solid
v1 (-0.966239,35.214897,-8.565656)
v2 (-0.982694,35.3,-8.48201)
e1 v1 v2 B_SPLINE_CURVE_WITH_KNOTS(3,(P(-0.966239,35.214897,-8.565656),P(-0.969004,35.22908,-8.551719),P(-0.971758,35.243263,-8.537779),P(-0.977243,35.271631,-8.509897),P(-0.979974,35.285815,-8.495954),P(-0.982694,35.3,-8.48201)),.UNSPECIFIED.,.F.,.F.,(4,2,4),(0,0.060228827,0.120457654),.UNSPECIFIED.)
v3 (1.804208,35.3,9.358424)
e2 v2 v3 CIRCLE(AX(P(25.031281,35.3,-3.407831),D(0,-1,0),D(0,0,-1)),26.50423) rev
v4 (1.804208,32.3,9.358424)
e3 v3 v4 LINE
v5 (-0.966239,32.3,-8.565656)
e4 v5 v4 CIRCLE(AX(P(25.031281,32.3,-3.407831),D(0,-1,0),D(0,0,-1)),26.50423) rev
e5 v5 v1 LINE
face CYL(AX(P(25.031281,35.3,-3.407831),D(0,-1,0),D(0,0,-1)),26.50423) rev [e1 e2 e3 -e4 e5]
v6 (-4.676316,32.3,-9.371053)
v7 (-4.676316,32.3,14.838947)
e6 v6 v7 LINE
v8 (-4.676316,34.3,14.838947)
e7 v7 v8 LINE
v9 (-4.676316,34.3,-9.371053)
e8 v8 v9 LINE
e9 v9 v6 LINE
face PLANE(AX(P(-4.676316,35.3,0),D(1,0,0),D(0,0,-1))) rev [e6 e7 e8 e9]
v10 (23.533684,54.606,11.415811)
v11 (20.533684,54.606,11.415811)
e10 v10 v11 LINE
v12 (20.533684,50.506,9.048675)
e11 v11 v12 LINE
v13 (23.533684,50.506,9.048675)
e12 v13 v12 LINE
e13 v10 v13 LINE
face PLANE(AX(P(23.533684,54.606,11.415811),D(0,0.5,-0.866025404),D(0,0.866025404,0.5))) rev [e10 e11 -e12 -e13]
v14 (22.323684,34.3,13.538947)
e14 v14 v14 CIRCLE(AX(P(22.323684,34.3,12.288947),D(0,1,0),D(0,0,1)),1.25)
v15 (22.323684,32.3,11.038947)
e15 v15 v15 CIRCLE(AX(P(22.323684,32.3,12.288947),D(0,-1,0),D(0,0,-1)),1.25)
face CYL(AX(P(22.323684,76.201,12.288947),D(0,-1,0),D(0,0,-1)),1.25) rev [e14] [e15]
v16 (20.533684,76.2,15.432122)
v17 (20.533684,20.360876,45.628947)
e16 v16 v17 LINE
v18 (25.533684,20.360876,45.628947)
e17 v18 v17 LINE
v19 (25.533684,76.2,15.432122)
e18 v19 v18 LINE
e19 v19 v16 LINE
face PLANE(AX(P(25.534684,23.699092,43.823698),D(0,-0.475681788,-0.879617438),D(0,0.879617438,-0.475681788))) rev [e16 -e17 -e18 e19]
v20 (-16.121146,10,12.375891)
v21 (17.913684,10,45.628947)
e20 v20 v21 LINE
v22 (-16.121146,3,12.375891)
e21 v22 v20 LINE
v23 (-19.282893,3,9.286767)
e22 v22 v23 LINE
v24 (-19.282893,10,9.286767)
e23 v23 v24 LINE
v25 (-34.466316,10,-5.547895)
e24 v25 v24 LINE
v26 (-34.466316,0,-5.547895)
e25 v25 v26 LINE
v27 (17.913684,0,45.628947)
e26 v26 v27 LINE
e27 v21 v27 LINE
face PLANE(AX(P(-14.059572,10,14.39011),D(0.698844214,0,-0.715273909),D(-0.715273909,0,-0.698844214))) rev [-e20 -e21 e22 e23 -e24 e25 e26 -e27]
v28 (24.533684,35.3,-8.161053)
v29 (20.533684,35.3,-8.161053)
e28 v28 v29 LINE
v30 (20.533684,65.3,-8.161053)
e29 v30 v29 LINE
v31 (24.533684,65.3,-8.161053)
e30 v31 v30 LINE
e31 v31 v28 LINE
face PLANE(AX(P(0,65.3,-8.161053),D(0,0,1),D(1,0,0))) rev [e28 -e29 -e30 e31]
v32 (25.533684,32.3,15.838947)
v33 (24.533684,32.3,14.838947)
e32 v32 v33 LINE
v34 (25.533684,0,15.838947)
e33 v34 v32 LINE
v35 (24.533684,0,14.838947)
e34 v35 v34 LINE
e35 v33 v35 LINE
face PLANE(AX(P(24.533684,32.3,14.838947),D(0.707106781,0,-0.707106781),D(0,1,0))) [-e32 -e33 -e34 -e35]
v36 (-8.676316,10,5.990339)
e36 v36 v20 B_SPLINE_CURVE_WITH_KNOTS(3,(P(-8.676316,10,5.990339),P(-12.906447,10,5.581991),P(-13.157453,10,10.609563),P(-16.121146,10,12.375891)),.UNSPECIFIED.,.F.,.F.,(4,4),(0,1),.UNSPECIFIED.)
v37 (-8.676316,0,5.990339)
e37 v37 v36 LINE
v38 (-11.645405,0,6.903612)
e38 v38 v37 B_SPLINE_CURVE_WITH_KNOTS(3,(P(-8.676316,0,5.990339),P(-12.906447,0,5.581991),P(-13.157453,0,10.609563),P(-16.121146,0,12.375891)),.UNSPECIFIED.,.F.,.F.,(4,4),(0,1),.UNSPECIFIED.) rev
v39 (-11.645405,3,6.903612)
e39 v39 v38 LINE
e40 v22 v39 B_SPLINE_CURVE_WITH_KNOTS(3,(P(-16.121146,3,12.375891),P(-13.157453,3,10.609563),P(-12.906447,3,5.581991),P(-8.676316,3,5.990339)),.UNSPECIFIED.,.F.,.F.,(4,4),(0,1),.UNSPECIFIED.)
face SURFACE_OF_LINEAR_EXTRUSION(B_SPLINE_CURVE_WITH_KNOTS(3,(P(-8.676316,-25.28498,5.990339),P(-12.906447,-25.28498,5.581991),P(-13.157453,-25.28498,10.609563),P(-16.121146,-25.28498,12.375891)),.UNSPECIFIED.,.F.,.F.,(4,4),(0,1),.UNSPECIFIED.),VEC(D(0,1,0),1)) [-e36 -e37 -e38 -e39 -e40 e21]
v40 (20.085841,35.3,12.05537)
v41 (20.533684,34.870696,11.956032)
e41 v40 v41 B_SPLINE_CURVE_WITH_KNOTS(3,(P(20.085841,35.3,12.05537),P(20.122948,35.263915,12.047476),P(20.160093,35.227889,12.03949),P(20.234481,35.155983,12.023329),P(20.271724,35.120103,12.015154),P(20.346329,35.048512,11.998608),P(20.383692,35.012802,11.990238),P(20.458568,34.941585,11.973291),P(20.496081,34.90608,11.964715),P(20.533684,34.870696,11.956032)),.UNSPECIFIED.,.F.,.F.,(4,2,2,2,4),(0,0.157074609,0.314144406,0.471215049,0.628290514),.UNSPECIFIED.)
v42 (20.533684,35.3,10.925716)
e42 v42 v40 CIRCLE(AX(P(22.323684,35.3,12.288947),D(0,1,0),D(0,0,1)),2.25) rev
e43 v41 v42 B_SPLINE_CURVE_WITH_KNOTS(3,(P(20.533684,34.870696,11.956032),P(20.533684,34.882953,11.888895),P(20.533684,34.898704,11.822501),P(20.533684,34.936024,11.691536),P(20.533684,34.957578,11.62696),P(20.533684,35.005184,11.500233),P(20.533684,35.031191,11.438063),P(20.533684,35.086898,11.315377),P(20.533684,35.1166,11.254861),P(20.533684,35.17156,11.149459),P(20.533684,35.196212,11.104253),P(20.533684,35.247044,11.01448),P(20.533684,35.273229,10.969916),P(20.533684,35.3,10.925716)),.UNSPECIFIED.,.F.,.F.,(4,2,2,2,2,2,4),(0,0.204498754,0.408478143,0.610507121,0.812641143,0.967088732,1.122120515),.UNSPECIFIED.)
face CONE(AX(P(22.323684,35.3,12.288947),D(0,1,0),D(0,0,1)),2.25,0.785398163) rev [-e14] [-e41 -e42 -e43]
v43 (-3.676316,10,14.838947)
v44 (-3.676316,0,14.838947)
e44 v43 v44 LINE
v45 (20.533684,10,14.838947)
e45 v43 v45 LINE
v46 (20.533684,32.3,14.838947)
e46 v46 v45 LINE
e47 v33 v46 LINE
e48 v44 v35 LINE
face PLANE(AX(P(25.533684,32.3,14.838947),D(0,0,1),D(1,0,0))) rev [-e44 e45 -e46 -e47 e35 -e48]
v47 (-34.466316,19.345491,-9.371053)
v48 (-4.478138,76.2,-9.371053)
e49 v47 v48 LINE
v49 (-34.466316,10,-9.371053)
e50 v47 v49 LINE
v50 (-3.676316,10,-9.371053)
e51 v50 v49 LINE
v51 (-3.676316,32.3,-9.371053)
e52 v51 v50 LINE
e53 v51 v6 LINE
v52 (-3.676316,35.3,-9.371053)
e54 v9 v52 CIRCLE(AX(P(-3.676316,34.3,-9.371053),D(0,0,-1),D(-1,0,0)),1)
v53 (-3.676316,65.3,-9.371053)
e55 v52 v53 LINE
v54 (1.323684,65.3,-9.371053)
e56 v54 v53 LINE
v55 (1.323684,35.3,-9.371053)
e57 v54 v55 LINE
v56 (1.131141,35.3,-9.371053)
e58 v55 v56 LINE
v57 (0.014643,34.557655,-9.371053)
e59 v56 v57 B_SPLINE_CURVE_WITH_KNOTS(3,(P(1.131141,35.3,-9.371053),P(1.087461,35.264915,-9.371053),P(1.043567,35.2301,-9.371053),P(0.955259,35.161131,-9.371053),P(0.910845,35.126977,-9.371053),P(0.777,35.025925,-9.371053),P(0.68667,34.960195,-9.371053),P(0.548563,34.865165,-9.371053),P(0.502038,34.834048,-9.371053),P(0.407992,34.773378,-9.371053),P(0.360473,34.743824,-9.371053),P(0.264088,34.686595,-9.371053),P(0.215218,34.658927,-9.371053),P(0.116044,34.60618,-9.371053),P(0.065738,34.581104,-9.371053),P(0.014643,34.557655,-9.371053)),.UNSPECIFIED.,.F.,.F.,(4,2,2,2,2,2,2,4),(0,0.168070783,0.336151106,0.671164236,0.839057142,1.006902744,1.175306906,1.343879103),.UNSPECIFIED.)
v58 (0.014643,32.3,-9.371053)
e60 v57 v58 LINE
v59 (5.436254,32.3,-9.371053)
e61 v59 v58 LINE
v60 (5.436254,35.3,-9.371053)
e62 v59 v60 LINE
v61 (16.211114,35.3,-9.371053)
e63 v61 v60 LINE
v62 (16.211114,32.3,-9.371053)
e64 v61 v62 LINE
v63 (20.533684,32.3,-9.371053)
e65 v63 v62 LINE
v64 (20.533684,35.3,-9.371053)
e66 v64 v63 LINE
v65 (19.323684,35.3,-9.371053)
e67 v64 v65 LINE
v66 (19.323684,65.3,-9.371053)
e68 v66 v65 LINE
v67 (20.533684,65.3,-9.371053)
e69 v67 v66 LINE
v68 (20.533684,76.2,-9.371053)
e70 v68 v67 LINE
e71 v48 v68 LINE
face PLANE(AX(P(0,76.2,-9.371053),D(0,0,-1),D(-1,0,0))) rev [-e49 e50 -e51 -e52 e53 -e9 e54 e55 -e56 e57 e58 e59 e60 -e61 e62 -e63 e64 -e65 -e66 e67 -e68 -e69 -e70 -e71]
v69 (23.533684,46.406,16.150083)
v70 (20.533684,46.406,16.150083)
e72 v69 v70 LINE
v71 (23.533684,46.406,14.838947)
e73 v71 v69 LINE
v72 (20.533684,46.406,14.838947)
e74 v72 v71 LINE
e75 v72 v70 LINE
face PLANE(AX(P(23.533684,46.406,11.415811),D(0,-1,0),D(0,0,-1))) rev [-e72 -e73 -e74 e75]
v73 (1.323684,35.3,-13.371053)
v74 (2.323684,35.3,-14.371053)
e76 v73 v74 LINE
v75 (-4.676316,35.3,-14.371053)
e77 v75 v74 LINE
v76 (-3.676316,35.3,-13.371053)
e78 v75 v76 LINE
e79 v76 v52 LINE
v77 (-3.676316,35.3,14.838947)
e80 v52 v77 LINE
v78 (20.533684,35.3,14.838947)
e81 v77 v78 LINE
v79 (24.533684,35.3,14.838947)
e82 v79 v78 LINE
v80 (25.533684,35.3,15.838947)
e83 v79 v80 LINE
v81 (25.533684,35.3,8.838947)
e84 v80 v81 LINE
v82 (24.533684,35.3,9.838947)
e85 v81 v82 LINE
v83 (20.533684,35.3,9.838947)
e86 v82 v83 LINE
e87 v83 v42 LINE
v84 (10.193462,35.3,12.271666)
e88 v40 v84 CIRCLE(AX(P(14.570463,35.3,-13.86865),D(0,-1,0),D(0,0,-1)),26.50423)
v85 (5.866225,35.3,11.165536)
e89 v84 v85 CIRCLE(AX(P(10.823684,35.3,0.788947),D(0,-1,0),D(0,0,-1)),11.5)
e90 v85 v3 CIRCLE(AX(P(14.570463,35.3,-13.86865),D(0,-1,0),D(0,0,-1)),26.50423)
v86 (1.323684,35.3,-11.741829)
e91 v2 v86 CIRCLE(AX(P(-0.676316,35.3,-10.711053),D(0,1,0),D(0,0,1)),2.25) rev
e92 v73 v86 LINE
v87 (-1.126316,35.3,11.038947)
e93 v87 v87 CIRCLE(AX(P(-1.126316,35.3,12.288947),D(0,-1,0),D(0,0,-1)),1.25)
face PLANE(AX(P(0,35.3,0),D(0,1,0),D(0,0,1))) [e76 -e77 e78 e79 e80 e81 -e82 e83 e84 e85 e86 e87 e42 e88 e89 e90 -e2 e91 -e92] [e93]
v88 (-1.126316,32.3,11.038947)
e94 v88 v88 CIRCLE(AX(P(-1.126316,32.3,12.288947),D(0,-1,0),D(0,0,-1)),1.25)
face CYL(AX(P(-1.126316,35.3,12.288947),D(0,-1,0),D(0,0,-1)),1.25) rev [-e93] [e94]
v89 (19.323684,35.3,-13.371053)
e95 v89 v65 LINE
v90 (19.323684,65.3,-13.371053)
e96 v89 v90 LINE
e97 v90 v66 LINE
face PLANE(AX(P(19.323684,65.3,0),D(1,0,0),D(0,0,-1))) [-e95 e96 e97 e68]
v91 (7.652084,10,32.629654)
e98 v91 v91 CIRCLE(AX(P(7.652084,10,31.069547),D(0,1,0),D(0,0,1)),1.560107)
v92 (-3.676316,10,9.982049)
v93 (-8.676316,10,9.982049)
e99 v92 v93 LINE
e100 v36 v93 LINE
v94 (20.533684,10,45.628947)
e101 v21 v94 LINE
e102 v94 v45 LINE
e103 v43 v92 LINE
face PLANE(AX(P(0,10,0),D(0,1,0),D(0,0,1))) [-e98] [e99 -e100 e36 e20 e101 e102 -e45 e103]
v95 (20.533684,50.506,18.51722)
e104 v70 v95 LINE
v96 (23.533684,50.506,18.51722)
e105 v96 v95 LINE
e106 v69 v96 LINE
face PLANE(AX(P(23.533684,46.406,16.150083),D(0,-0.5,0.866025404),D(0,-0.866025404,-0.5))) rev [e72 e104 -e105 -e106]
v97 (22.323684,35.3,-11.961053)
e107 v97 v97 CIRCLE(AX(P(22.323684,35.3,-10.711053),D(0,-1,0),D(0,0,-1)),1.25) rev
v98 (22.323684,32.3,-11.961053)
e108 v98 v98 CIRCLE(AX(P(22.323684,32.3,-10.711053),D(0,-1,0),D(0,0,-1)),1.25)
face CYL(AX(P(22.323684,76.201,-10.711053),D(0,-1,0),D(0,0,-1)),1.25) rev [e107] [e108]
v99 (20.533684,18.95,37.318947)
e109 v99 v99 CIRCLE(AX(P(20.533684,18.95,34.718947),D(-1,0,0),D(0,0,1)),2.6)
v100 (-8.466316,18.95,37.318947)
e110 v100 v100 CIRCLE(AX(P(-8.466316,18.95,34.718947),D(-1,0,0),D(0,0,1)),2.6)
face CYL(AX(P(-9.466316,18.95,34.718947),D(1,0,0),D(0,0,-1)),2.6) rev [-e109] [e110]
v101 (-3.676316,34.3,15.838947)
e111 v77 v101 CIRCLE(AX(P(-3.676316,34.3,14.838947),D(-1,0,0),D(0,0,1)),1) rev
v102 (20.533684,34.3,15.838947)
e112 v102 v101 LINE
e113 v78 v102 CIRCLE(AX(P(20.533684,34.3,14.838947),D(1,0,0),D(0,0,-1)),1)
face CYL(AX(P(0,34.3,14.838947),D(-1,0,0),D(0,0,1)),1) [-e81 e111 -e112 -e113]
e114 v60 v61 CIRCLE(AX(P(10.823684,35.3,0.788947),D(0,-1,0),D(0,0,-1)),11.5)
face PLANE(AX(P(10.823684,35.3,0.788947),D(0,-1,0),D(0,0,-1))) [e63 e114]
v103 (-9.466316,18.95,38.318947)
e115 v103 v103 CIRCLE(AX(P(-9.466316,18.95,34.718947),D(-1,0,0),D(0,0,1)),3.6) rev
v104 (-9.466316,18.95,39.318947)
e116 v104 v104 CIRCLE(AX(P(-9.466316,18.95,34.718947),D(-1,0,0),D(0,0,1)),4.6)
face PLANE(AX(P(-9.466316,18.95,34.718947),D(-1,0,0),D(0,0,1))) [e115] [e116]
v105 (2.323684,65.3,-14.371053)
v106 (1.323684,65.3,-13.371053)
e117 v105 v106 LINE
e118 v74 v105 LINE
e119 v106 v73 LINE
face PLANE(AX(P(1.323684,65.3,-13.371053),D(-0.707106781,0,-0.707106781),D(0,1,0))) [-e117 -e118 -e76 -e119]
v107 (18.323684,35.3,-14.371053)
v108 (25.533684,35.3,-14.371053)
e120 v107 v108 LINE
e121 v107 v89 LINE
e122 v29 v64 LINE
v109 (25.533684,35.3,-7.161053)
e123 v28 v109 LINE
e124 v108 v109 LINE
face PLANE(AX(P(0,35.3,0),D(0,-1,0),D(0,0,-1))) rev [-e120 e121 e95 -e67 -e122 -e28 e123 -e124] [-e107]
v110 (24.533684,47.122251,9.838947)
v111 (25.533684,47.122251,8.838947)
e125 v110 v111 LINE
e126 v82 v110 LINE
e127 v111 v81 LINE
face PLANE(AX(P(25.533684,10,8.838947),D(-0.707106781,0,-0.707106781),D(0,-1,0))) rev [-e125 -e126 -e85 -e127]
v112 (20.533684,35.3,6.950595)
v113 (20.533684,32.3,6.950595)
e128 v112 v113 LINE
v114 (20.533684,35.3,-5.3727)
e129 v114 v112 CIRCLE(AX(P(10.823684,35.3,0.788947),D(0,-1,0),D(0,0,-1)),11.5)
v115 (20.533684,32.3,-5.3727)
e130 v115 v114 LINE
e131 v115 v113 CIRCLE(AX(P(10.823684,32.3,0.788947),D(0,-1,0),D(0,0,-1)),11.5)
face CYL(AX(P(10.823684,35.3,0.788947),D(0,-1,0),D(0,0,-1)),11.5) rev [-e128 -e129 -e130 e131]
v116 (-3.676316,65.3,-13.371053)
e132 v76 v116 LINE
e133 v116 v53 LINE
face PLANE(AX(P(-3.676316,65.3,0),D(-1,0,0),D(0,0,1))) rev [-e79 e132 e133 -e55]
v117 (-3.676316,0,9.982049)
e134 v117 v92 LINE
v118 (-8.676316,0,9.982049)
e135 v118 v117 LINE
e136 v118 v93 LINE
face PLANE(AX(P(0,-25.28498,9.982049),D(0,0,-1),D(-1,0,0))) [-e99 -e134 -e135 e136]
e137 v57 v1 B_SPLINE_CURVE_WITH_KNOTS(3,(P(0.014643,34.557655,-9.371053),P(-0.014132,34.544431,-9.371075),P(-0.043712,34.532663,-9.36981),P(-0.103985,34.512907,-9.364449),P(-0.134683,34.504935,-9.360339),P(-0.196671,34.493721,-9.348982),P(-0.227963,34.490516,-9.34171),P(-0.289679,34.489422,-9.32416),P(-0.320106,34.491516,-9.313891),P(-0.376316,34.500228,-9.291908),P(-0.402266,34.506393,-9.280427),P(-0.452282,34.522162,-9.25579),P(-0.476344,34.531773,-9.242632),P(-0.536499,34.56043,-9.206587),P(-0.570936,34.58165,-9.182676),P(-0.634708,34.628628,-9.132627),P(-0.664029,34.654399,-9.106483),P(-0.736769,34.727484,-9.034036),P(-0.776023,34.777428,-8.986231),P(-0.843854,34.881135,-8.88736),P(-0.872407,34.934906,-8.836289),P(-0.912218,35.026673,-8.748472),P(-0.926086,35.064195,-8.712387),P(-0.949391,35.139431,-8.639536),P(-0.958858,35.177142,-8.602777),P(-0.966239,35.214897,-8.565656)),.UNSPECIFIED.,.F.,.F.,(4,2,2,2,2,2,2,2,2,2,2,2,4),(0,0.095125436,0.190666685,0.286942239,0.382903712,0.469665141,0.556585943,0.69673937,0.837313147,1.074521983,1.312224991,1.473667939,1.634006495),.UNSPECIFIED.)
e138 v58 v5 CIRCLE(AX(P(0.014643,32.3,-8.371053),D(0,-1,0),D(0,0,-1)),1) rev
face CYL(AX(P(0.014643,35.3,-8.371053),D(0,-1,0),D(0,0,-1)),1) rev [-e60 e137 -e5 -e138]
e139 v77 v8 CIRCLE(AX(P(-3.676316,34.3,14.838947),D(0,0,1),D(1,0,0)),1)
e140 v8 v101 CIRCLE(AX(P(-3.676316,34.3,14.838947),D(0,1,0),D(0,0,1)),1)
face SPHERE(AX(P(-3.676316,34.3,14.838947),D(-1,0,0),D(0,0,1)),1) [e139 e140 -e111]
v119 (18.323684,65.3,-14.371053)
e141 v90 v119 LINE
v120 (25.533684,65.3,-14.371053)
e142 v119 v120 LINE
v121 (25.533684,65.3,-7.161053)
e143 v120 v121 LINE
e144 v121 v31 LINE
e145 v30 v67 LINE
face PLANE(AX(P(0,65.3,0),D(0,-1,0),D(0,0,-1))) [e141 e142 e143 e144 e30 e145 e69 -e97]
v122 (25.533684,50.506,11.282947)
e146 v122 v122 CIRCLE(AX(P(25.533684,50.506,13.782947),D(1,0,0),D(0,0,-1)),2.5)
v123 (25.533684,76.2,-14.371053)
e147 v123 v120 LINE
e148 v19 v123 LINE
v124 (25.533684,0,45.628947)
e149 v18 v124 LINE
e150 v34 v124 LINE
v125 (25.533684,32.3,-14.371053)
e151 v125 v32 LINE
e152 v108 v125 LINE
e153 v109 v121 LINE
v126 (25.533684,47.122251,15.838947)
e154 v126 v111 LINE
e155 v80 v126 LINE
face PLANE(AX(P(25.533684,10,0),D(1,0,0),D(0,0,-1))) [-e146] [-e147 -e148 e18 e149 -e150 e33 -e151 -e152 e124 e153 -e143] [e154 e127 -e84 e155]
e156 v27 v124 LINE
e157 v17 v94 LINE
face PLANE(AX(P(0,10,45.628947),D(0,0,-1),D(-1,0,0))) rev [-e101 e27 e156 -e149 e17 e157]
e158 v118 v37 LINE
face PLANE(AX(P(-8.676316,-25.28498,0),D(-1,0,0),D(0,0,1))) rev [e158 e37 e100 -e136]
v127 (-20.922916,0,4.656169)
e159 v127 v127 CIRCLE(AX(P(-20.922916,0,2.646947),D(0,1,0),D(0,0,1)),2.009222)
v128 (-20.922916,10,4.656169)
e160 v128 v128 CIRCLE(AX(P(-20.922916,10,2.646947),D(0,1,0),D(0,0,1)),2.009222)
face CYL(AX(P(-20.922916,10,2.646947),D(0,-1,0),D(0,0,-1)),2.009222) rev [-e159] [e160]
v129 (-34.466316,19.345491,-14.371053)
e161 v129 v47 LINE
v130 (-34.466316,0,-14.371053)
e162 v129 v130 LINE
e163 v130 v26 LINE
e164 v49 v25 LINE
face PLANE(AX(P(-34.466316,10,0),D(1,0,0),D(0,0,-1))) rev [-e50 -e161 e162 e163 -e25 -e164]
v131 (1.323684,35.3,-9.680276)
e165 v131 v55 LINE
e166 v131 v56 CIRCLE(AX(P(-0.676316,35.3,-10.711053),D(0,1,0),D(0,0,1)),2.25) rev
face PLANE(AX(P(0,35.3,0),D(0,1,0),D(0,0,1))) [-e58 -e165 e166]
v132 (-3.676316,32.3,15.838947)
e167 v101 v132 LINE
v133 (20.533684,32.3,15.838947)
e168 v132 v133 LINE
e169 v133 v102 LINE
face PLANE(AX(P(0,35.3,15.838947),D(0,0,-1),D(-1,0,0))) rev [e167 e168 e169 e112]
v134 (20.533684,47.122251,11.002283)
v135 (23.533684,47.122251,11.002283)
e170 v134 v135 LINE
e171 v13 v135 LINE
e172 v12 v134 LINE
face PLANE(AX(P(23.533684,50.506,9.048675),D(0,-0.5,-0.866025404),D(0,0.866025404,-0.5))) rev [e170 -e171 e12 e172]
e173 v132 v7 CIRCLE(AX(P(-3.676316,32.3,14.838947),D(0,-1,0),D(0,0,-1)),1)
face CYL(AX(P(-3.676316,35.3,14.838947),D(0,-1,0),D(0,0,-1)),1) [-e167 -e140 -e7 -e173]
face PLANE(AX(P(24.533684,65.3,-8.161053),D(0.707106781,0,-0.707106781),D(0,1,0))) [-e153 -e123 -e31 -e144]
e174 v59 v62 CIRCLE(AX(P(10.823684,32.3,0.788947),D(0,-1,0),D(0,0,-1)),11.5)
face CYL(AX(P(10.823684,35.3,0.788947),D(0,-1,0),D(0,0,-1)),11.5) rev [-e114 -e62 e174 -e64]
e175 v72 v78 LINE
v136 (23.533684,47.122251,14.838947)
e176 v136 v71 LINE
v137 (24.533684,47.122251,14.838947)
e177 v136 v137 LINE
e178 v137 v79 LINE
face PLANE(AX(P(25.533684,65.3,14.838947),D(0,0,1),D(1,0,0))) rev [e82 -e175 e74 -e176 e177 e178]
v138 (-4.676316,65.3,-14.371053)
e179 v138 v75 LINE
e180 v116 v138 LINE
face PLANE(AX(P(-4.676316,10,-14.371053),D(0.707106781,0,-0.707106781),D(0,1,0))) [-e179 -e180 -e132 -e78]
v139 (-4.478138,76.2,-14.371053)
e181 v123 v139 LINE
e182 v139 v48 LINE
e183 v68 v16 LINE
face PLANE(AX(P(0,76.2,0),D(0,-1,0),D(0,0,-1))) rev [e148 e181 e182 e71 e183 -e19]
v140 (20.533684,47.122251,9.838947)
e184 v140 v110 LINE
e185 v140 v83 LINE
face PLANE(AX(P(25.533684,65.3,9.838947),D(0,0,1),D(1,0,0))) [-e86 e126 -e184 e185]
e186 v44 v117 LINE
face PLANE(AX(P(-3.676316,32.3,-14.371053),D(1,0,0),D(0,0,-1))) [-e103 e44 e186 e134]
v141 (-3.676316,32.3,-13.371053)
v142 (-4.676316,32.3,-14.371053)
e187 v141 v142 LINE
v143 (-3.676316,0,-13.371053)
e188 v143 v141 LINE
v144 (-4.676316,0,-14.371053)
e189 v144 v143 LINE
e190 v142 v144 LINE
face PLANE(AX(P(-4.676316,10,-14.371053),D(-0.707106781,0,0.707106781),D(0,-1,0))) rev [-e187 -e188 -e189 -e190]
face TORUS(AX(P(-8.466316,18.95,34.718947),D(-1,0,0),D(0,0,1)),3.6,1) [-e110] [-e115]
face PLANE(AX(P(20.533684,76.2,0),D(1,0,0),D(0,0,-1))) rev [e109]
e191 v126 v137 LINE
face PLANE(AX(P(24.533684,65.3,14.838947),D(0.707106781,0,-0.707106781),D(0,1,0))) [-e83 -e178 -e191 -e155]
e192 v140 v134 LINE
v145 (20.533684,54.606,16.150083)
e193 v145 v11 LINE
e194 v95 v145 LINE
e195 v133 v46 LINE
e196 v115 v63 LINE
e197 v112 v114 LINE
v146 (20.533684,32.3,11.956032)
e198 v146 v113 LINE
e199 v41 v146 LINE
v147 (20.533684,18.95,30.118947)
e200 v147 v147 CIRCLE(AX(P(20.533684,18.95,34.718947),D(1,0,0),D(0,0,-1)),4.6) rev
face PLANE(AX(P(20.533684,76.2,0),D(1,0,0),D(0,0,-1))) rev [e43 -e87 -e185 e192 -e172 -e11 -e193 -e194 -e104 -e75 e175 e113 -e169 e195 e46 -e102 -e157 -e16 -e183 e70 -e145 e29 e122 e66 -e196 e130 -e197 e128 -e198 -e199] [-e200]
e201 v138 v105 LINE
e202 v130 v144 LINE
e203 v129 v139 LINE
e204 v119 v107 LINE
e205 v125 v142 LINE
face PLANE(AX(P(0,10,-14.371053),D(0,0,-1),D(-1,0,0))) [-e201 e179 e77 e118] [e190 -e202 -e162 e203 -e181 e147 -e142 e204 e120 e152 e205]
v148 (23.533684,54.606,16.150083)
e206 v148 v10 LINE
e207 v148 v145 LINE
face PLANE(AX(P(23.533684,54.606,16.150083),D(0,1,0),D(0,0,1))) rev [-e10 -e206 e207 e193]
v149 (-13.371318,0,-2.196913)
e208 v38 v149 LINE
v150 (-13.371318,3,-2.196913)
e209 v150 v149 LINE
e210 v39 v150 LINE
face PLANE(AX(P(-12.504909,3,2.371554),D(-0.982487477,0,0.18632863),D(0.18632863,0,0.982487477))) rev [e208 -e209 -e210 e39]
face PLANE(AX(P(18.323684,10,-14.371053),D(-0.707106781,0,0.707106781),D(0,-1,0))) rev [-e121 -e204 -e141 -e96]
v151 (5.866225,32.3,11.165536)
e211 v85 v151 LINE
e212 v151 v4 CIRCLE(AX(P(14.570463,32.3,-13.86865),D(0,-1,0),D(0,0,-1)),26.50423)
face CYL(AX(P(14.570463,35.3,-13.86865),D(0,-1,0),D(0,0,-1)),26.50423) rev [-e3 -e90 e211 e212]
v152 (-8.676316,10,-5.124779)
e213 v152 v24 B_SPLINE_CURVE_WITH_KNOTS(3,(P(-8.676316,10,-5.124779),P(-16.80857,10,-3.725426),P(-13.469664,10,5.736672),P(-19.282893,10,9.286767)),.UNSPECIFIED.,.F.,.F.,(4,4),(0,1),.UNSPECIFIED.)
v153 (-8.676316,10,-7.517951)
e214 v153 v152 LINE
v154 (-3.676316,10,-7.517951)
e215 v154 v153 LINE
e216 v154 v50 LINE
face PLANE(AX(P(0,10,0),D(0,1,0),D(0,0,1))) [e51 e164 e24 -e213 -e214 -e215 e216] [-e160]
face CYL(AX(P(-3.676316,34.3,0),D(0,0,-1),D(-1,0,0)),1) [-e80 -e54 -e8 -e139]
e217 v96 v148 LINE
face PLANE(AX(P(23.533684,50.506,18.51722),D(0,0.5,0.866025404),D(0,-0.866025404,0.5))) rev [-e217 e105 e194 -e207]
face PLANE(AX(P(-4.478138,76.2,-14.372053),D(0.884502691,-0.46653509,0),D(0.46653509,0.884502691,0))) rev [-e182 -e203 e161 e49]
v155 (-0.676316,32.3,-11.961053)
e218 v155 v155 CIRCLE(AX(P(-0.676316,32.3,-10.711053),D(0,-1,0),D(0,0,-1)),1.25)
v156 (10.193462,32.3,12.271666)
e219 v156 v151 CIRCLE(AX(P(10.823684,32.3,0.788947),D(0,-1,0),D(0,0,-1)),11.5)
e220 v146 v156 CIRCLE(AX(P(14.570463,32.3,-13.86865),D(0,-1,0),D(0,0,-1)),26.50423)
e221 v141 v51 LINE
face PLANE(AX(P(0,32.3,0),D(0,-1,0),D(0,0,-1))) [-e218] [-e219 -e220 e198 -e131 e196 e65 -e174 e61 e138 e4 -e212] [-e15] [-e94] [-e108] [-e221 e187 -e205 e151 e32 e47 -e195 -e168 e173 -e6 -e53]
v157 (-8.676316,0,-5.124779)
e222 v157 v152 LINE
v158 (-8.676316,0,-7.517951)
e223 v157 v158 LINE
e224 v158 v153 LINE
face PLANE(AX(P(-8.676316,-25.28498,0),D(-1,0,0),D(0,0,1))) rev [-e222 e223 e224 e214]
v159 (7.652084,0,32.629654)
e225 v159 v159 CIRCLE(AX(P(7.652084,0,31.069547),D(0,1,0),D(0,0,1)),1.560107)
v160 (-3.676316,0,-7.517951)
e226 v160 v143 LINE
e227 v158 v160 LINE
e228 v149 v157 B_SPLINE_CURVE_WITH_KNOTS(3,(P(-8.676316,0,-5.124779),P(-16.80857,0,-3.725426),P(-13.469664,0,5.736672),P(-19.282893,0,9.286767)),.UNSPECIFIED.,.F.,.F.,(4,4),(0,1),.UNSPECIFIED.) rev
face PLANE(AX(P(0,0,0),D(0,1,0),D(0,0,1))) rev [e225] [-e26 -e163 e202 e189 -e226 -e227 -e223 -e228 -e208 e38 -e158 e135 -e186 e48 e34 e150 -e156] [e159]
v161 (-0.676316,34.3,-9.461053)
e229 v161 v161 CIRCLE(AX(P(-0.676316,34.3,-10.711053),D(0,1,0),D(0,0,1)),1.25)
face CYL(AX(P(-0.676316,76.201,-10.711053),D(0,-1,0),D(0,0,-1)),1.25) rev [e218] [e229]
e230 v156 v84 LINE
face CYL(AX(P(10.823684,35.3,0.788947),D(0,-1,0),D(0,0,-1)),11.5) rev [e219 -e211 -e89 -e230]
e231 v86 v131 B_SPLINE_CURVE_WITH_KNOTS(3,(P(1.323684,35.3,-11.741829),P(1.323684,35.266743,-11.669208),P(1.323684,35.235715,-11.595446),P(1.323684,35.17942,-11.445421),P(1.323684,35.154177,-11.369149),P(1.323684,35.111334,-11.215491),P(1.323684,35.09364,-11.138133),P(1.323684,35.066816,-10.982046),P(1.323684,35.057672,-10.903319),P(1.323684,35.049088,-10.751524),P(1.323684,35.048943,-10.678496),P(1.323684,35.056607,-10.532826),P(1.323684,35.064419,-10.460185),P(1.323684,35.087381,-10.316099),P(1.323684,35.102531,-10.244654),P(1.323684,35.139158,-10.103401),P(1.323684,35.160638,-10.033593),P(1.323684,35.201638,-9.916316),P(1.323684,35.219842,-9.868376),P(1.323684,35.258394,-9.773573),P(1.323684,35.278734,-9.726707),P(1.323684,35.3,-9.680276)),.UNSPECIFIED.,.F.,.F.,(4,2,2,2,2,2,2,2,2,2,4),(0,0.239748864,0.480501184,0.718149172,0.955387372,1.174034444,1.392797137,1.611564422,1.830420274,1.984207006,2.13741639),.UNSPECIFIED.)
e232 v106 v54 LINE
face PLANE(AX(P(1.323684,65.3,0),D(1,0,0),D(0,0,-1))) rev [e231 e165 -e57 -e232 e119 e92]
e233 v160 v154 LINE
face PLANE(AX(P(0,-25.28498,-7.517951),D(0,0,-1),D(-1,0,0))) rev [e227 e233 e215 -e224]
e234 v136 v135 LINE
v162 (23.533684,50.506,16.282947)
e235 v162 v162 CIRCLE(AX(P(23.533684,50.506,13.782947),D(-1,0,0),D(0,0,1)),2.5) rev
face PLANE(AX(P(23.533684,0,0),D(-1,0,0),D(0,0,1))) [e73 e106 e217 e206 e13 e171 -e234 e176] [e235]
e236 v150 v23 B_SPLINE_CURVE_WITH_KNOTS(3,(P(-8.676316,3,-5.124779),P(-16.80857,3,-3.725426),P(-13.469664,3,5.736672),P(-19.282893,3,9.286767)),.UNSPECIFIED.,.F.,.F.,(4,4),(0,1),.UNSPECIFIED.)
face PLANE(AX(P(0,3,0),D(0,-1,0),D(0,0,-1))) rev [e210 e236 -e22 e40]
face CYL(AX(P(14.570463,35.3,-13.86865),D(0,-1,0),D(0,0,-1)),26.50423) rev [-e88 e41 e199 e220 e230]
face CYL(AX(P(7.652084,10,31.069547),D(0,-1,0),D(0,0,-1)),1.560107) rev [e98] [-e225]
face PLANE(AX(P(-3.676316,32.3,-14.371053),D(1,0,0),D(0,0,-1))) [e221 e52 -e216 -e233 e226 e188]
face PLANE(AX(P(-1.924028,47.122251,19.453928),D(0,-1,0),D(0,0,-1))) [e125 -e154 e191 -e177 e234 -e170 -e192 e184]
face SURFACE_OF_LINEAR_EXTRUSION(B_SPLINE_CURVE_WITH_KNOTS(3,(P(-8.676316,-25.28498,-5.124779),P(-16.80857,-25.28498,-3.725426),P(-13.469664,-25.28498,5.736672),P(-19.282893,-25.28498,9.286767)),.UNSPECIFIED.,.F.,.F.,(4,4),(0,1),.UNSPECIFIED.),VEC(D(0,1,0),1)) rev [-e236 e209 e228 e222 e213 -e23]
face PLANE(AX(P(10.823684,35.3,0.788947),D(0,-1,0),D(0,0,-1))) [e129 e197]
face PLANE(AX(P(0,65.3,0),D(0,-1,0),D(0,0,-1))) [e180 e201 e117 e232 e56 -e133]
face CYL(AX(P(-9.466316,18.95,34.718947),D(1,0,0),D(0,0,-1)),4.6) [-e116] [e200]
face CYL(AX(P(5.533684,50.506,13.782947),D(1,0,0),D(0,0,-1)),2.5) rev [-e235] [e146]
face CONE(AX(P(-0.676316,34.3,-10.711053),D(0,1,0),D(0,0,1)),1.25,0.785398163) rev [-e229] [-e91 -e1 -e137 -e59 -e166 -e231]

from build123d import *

# Parameters (mm, degrees)
SKETCH1_R                      = 1.560106864
SKETCH1_R_2                    = 2.009221825
BOSS_EXTRUDE1_DEPTH            = 10
BOSS_EXTRUDE3_START            = -10
BOSS_EXTRUDE3_DEPTH            = 76.2
CUT_EXTRUDE1_REACH             = 89.478
SKETCH4_W                      = 29.21
SKETCH4_H                      = 29.21
CUT_EXTRUDE1_DIRECTION_2_DEPTH = 22.3
CUT_EXTRUDE2_START             = -3
SKETCH5_W                      = 6.21
SKETCH5_H                      = 5
SKETCH5_W_2                    = 5
SKETCH5_H_2                    = 6.21
CUT_EXTRUDE2_DEPTH             = 30
CUT_EXTRUDE3_REACH             = 74.091
SKETCH6_R                      = 1.25
CHAMFER1_SIZE                  = 1
CUT_EXTRUDE4_REACH             = 102.097
CUT_EXTRUDE5_REACH             = 106.467
SKETCH9_R                      = 1.25
BOSS_EXTRUDE4_DEPTH            = 3
FILLET2_R                      = 1
SKETCH10_R                     = 11.5
CUT_EXTRUDE6_DEPTH             = 3
SKETCH12_R                     = 4.6
SKETCH12_R_2                   = 2.6
BOSS_EXTRUDE5_DEPTH            = 30
FILLET3_R                      = 1
CHAMFER2_SIZE                  = 1
BOSS_EXTRUDE6_REACH            = 109.184
SKETCH14_W                     = 12.395863616
SKETCH14_H                     = 18.726756054
SKETCH13_R                     = 2.5
CUT_EXTRUDE7_DEPTH             = 20
CUT_EXTRUDE8_DEPTH             = 3
CUT_EXTRUDE11_DEPTH            = 10
BOSS_EXTRUDE8_DEPTH            = 3


with BuildPart() as part:
    # Sketch1 → Boss-Extrude1 (new body)
    with BuildSketch(Plane(origin=(0, 0, 0), x_dir=(1, 0, 0), z_dir=(0, 1, 0))):
        Polygon((-34.466315789, 14.371052632), (-34.466315789, 5.547894737), (17.913684211, -45.628947368), (25.533684211, -45.628947368), (25.533684211, 14.371052632), align=None)
        with Locations(Location((7.652084211, -31.069547368, 0), (0, 0, 270))):
            Circle(SKETCH1_R, mode=Mode.SUBTRACT)
        with Locations(Location((-20.922915789, -2.646947368, 0), (0, 0, 270))):
            Circle(SKETCH1_R_2, mode=Mode.SUBTRACT)
    extrude(amount=BOSS_EXTRUDE1_DEPTH)

    # Sketch3 → Boss-Extrude3 (add)
    with BuildSketch(Plane(origin=(0, 10, 0), x_dir=(1, 0, 0), z_dir=(0, 1, 0)).offset(BOSS_EXTRUDE3_START)):
        Polygon((-34.466315789, 14.371052632), (-34.466315789, 9.371052632), (20.533684211, 9.371052632), (20.533684211, -45.628947368), (25.533684211, -45.628947368), (25.533684211, 14.371052632), align=None)
    extrude(amount=BOSS_EXTRUDE3_DEPTH)

    # Sketch4 → Cut-Extrude1 (cut, up to next)
    with BuildSketch(Plane(origin=(0, 10, 0), x_dir=(1, 0, 0), z_dir=(0, 1, 0)), mode=Mode.PRIVATE) as cut_extrude1_sk1:
        with Locations((10.928684211, -0.233947368)):
            Rectangle(SKETCH4_W, SKETCH4_H)
    cut_extrude1_tool1 = extrude(cut_extrude1_sk1.sketch, amount=-CUT_EXTRUDE1_REACH, mode=Mode.PRIVATE) & part.part
    add(cut_extrude1_tool1.solids().sort_by_distance((10.928684, 10, 0.233947))[0], mode=Mode.SUBTRACT)

    # Sketch4 → Cut-Extrude1 direction 2 (cut)
    with BuildSketch(Plane(origin=(0, 10, 0), x_dir=(1, 0, 0), z_dir=(0, 1, 0))):
        with Locations((10.928684211, -0.233947368)):
            Rectangle(SKETCH4_W, SKETCH4_H)
    extrude(amount=CUT_EXTRUDE1_DIRECTION_2_DEPTH, mode=Mode.SUBTRACT)

    # Sketch5 → Cut-Extrude2 (cut)
    with BuildSketch(Plane.XZ.offset(-32.3).offset(CUT_EXTRUDE2_START)):
        with Locations((22.428684211, 12.338947368)):
            Rectangle(SKETCH5_W, SKETCH5_H)
        with Locations((-1.176315789, -11.266052632)):
            Rectangle(SKETCH5_W_2, SKETCH5_H_2)
        with Locations((22.428684211, -11.266052632)):
            Rectangle(SKETCH5_W, SKETCH5_H_2)
    extrude(amount=-CUT_EXTRUDE2_DEPTH, mode=Mode.SUBTRACT)

    # Sketch6 → Cut-Extrude3 (cut, up to next)
    with BuildSketch(Plane.XZ.offset(-32.3), mode=Mode.PRIVATE) as cut_extrude3_sk1:
        with Locations(Location((22.323684211, 12.288947368, 0), (0, 0, 270))):
            Circle(SKETCH6_R)
    cut_extrude3_tool1 = extrude(cut_extrude3_sk1.sketch, amount=-CUT_EXTRUDE3_REACH, mode=Mode.PRIVATE) & part.part
    # Sketch6 → Cut-Extrude3 (cut, up to next)
    with BuildSketch(Plane.XZ.offset(-32.3), mode=Mode.PRIVATE) as cut_extrude3_sk2:
        with Locations(Location((22.323684211, -10.711052632, 0), (0, 0, 270))):
            Circle(SKETCH6_R)
    cut_extrude3_tool2 = extrude(cut_extrude3_sk2.sketch, amount=-CUT_EXTRUDE3_REACH, mode=Mode.PRIVATE) & part.part
    # Sketch6 → Cut-Extrude3 (cut, up to next)
    with BuildSketch(Plane.XZ.offset(-32.3), mode=Mode.PRIVATE) as cut_extrude3_sk3:
        with Locations(Location((-0.676315789, -10.711052632, 0), (0, 0, 270))):
            Circle(SKETCH6_R)
    cut_extrude3_tool3 = extrude(cut_extrude3_sk3.sketch, amount=-CUT_EXTRUDE3_REACH, mode=Mode.PRIVATE) & part.part
    add(cut_extrude3_tool1.solids().sort_by_distance((22.323684, 32.3, 12.288947))[0], mode=Mode.SUBTRACT)
    add(cut_extrude3_tool2.solids().sort_by_distance((22.323684, 32.3, -10.711053))[0], mode=Mode.SUBTRACT)
    add(cut_extrude3_tool3.solids().sort_by_distance((-0.676316, 32.3, -10.711053))[0], mode=Mode.SUBTRACT)

    # Chamfer1
    chamfer1_edges = [part.edges().sort_by_distance(p)[0] for p in [
        (19.323684211, 50.3, -14.371052632),
        (25.533684211, 50.3, -8.161052632),
        (-3.676315789, 50.3, -14.371052632),
        (1.323684211, 50.3, -14.371052632),
        (25.533684211, 16.15, 14.838947368),
        (-3.676315789, 16.15, -14.371052632),
        (25.533684211, 50.3, 9.838947368),
        (25.533684211, 50.3, 14.838947368),
    ]]
    chamfer(chamfer1_edges, length=CHAMFER1_SIZE)

    # Sketch7 → Cut-Extrude4 (cut, up to next)
    with BuildSketch(Plane.XY.offset(-9.371052632), mode=Mode.PRIVATE) as cut_extrude4_sk1:
        Polygon((-4.478138481, 76.2), (-34.466315789, 19.345490892), (-34.466315789, 76.2), align=None)
    cut_extrude4_tool1 = extrude(cut_extrude4_sk1.sketch, amount=-CUT_EXTRUDE4_REACH, mode=Mode.PRIVATE) & part.part
    add(cut_extrude4_tool1.solids().sort_by_distance((-24.470257, 57.248497, -9.371053))[0], mode=Mode.SUBTRACT)

    # Sketch8 → Cut-Extrude5 (cut, up to next)
    with BuildSketch(Plane.ZY.offset(-20.533684211), mode=Mode.PRIVATE) as cut_extrude5_sk1:
        Polygon((45.628947368, 76.2), (15.432121686, 76.2), (45.628947368, 20.360875822), align=None)
    cut_extrude5_tool1 = extrude(cut_extrude5_sk1.sketch, amount=-CUT_EXTRUDE5_REACH, mode=Mode.PRIVATE) & part.part
    add(cut_extrude5_tool1.solids().sort_by_distance((20.533684, 57.586959, 35.563339))[0], mode=Mode.SUBTRACT)

    # Sketch9 → Boss-Extrude4 (add)
    with BuildSketch(Plane.XZ.offset(-32.3)):
        with BuildLine():
            Line((-4.676315789, 15.838947368), (-4.676315789, -14.371052632))
            Line((-4.676315789, -14.371052632), (0.900761385, -14.371052632))
            ThreePointArc((0.900761385, -14.371052632), (0.366362818, -13.109171958), (-0.102099011, -11.821356685))
            ThreePointArc((-0.102099011, -11.821356685), (-1.878735883, -11.052645838), (-0.771600032, -9.464689557))
            ThreePointArc((-0.771600032, -9.464689557), (-1.228222209, 0.185593043), (1.804207587, 9.358423992))
            ThreePointArc((1.804207587, 9.358423992), (11.255772005, 12.427491579), (21.173303455, 11.799944181))
            ThreePointArc((21.173303455, 11.799944181), (22.678913505, 13.487409779), (23.021780943, 11.252047686))
            ThreePointArc((23.021780943, 11.252047686), (24.290349599, 10.788966069), (25.533684211, 10.261870194))
            Line((25.533684211, 10.261870194), (25.533684211, 15.838947368))
            Line((25.533684211, 15.838947368), (-4.676315789, 15.838947368))
        make_face()
        with Locations(Location((-1.126315789, 12.288947368, 0), (0, 0, 270))):
            Circle(SKETCH9_R, mode=Mode.SUBTRACT)
    extrude(amount=-BOSS_EXTRUDE4_DEPTH)

    # Fillet2
    fillet2_edges = [part.edges().sort_by_distance(p)[0] for p in [
        (7.928684211, 35.3, 15.838947368),
        (-4.676315789, 35.3, 3.233947368),
        (-4.676315789, 33.8, 15.838947368),
        (-0.793400855, 33.8, -9.371052632),
    ]]
    fillet(fillet2_edges, radius=FILLET2_R)

    # Sketch10 → Cut-Extrude6 (cut)
    with BuildSketch(Plane.XZ.offset(-32.3)):
        with Locations((10.823684211, 0.788947368)):
            Circle(SKETCH10_R)
    extrude(amount=-CUT_EXTRUDE6_DEPTH, mode=Mode.SUBTRACT)

    # Sketch12 → Boss-Extrude5 (add)
    with BuildSketch(Plane.ZY.offset(-20.533684211)):
        with Locations(Location((34.718947368, 18.95, 0), (0, 0, 180))):
            Circle(SKETCH12_R)
        with Locations((34.718947368, 18.95)):
            Circle(SKETCH12_R_2, mode=Mode.SUBTRACT)
    extrude(amount=BOSS_EXTRUDE5_DEPTH)

    # Fillet3
    fillet3_edges = [part.edges().sort_by_distance(p)[0] for p in [
        (-9.466315789, 18.95, 32.118947368),
    ]]
    fillet(fillet3_edges, radius=FILLET3_R)

    # Chamfer2
    # the kernel refuses this chamfer: 1 mm, written as the material it takes off along each edge
    with BuildSketch(Plane(origin=(22.323684211, 35.3, 12.288947368), x_dir=(-0.9203046044214335, 0, -0.3912025499414705), z_dir=(0.3912025499414705, 0, -0.9203046044214335))) as chamfer2_piece_1:
        Polygon((1.25 + CHAMFER2_SIZE, 0), (1.25, -CHAMFER2_SIZE), (1.25, 0), align=None)
    revolve(axis=Axis((22.323684211, 35.3, 12.288947368), (0, 1, 0)), revolution_arc=259.078782156, mode=Mode.SUBTRACT)
    with BuildSketch(Plane(origin=(-0.676315789, 35.3, -10.711052632), x_dir=(0, 0, -1), z_dir=(-1, 0, 0))) as chamfer2_piece_2_section:
        Polygon((1.25 + CHAMFER2_SIZE, 0), (1.25, CHAMFER2_SIZE), (1.25, 0), align=None)
    chamfer2_piece_2 = revolve(axis=Axis((-0.676315789, 35.3, -10.711052632), (0, -1, 0)), mode=Mode.PRIVATE)
    chamfer2_piece_2 = split(chamfer2_piece_2, bisect_by=Plane(origin=(1.323684211, 34.812414485, -8.973467116), z_dir=(-1, 0, 0)), keep=Keep.TOP, mode=Mode.PRIVATE)
    add(chamfer2_piece_2, mode=Mode.SUBTRACT)
    with BuildSketch(Plane(origin=(22.323684211, 35.3, 12.288947368), x_dir=(-0.920304604421433, 0, -0.39120254994147174), z_dir=(-0.39120254994147174, 0, 0.920304604421433))) as chamfer2_piece_3:
        Polygon((1.25 + CHAMFER2_SIZE, 0), (1.25, CHAMFER2_SIZE), (1.25, 0), align=None)
    revolve(axis=Axis((22.323684211, 35.3, 12.288947368), (0, -1, 0)), revolution_arc=66.970653716, mode=Mode.SUBTRACT)
    with BuildSketch(Plane(origin=(22.323684211, 35.3, 12.288947368), x_dir=(0, 0, -1), z_dir=(-1, 0, 0))) as chamfer2_piece_4:
        Polygon((1.25 + CHAMFER2_SIZE, 0), (1.25, CHAMFER2_SIZE), (1.25, 0), align=None)
    revolve(axis=Axis((22.323684211, 35.3, 12.288947368), (0, -1, 0)), revolution_arc=33.950564129, mode=Mode.SUBTRACT)

    # Boss-Extrude6: up to this face of the body (flat: up to its plane)
    boss_extrude6_end = Plane(part.part.faces().sort_by_distance((20.533684211, 43.280549831, 15.597165562))[0])
    # Sketch14 → Boss-Extrude6 (add, up to the picked face)
    with BuildSketch(Plane(origin=(25.533684211, 0, 0), x_dir=(0, 0, -1), z_dir=(1, 0, 0)), mode=Mode.PRIVATE) as boss_extrude6_sk1:
        with Locations((-13.255996287, 56.485629394)):
            Rectangle(SKETCH14_W, SKETCH14_H)
    boss_extrude6_tool1 = split(extrude(boss_extrude6_sk1.sketch, amount=-BOSS_EXTRUDE6_REACH, mode=Mode.PRIVATE), bisect_by=boss_extrude6_end, keep=Keep.BOTH, mode=Mode.PRIVATE)
    add(boss_extrude6_tool1.solids().sort_by(Axis((25.533684, 56.485629, 13.255996), (-1, 0, 0)))[0])

    # Sketch13 → Cut-Extrude7 (cut)
    with BuildSketch(Plane(origin=(25.533684211, 0, 0), x_dir=(0, 0, -1), z_dir=(1, 0, 0))):
        with Locations((-13.782947368, 50.506)):
            Circle(SKETCH13_R)
    extrude(amount=-CUT_EXTRUDE7_DEPTH, mode=Mode.SUBTRACT)

    # Sketch15 → Cut-Extrude8 (cut)
    with BuildSketch(Plane.ZY.offset(-20.533684211)):
        Polygon((16.150083472, 46.406), (18.517219576, 50.506), (16.150083472, 54.606), (11.415811265, 54.606), (9.048675161, 50.506), (11.415811265, 46.406), align=None)
    extrude(amount=-CUT_EXTRUDE8_DEPTH, mode=Mode.SUBTRACT)

    # Sketch19 → Cut-Extrude11 (cut)
    with BuildSketch(Plane(origin=(0, 10, 0), x_dir=(1, 0, 0), z_dir=(0, 1, 0))):
        Polygon((-3.676315789, 2.857670413), (-3.676315789, 7.517950593), (-8.676315789, 7.517950593), (-8.676315789, 5.124778841), (-8.676315789, -5.990338695), (-8.676315789, -9.982049407), (-3.676315789, -9.982049407), align=None)
        with BuildLine():
            Line((-8.676315789, -5.990338695), (-8.676315789, 5.124778841))
            add(Edge.make_bspline(
                [(-8.676315789, 5.124778841), (-16.808569573, 3.725426293), (-13.469663804, -5.736672492), (-19.282893487, -9.286767458)],
                knots=[0, 0, 0, 0, 1, 1, 1, 1], degree=3))
            Line((-19.282893487, -9.286767458), (-16.121145543, -12.375890698))
            add(Edge.make_bspline(
                [(-8.676315789, -5.990338695), (-12.90644661, -5.58199058), (-13.157452533, -10.60956316), (-16.121145543, -12.375890698)],
                knots=[0, 0, 0, 0, 1, 1, 1, 1], degree=3))
        make_face()
    extrude(amount=-CUT_EXTRUDE11_DEPTH, mode=Mode.SUBTRACT)

    # Sketch20 → Boss-Extrude8 (add)
    with BuildSketch(Plane.XZ):
        with BuildLine():
            add(Edge.make_bspline(
                [(-16.121145543, 12.375890698), (-14.069186941, 11.152946562), (-13.317608867, 8.366659728), (-11.645404629, 6.903612087)],
                knots=[0, 0, 0, 0, 0.692365436, 0.692365436, 0.692365436, 0.692365436], degree=3))
            Line((-16.121145543, 12.375890698), (-19.282893487, 9.286767458))
            add(Edge.make_bspline(
                [(-13.371318098, -2.196913004), (-15.640126217, 1.283314512), (-15.162227429, 6.77030817), (-19.282893487, 9.286767458)],
                knots=[0.291157191, 0.291157191, 0.291157191, 0.291157191, 1, 1, 1, 1], degree=3))
            Line((-13.371318098, -2.196913004), (-11.645404629, 6.903612087))
        make_face()
    extrude(amount=-BOSS_EXTRUDE8_DEPTH)


solid = part.part
